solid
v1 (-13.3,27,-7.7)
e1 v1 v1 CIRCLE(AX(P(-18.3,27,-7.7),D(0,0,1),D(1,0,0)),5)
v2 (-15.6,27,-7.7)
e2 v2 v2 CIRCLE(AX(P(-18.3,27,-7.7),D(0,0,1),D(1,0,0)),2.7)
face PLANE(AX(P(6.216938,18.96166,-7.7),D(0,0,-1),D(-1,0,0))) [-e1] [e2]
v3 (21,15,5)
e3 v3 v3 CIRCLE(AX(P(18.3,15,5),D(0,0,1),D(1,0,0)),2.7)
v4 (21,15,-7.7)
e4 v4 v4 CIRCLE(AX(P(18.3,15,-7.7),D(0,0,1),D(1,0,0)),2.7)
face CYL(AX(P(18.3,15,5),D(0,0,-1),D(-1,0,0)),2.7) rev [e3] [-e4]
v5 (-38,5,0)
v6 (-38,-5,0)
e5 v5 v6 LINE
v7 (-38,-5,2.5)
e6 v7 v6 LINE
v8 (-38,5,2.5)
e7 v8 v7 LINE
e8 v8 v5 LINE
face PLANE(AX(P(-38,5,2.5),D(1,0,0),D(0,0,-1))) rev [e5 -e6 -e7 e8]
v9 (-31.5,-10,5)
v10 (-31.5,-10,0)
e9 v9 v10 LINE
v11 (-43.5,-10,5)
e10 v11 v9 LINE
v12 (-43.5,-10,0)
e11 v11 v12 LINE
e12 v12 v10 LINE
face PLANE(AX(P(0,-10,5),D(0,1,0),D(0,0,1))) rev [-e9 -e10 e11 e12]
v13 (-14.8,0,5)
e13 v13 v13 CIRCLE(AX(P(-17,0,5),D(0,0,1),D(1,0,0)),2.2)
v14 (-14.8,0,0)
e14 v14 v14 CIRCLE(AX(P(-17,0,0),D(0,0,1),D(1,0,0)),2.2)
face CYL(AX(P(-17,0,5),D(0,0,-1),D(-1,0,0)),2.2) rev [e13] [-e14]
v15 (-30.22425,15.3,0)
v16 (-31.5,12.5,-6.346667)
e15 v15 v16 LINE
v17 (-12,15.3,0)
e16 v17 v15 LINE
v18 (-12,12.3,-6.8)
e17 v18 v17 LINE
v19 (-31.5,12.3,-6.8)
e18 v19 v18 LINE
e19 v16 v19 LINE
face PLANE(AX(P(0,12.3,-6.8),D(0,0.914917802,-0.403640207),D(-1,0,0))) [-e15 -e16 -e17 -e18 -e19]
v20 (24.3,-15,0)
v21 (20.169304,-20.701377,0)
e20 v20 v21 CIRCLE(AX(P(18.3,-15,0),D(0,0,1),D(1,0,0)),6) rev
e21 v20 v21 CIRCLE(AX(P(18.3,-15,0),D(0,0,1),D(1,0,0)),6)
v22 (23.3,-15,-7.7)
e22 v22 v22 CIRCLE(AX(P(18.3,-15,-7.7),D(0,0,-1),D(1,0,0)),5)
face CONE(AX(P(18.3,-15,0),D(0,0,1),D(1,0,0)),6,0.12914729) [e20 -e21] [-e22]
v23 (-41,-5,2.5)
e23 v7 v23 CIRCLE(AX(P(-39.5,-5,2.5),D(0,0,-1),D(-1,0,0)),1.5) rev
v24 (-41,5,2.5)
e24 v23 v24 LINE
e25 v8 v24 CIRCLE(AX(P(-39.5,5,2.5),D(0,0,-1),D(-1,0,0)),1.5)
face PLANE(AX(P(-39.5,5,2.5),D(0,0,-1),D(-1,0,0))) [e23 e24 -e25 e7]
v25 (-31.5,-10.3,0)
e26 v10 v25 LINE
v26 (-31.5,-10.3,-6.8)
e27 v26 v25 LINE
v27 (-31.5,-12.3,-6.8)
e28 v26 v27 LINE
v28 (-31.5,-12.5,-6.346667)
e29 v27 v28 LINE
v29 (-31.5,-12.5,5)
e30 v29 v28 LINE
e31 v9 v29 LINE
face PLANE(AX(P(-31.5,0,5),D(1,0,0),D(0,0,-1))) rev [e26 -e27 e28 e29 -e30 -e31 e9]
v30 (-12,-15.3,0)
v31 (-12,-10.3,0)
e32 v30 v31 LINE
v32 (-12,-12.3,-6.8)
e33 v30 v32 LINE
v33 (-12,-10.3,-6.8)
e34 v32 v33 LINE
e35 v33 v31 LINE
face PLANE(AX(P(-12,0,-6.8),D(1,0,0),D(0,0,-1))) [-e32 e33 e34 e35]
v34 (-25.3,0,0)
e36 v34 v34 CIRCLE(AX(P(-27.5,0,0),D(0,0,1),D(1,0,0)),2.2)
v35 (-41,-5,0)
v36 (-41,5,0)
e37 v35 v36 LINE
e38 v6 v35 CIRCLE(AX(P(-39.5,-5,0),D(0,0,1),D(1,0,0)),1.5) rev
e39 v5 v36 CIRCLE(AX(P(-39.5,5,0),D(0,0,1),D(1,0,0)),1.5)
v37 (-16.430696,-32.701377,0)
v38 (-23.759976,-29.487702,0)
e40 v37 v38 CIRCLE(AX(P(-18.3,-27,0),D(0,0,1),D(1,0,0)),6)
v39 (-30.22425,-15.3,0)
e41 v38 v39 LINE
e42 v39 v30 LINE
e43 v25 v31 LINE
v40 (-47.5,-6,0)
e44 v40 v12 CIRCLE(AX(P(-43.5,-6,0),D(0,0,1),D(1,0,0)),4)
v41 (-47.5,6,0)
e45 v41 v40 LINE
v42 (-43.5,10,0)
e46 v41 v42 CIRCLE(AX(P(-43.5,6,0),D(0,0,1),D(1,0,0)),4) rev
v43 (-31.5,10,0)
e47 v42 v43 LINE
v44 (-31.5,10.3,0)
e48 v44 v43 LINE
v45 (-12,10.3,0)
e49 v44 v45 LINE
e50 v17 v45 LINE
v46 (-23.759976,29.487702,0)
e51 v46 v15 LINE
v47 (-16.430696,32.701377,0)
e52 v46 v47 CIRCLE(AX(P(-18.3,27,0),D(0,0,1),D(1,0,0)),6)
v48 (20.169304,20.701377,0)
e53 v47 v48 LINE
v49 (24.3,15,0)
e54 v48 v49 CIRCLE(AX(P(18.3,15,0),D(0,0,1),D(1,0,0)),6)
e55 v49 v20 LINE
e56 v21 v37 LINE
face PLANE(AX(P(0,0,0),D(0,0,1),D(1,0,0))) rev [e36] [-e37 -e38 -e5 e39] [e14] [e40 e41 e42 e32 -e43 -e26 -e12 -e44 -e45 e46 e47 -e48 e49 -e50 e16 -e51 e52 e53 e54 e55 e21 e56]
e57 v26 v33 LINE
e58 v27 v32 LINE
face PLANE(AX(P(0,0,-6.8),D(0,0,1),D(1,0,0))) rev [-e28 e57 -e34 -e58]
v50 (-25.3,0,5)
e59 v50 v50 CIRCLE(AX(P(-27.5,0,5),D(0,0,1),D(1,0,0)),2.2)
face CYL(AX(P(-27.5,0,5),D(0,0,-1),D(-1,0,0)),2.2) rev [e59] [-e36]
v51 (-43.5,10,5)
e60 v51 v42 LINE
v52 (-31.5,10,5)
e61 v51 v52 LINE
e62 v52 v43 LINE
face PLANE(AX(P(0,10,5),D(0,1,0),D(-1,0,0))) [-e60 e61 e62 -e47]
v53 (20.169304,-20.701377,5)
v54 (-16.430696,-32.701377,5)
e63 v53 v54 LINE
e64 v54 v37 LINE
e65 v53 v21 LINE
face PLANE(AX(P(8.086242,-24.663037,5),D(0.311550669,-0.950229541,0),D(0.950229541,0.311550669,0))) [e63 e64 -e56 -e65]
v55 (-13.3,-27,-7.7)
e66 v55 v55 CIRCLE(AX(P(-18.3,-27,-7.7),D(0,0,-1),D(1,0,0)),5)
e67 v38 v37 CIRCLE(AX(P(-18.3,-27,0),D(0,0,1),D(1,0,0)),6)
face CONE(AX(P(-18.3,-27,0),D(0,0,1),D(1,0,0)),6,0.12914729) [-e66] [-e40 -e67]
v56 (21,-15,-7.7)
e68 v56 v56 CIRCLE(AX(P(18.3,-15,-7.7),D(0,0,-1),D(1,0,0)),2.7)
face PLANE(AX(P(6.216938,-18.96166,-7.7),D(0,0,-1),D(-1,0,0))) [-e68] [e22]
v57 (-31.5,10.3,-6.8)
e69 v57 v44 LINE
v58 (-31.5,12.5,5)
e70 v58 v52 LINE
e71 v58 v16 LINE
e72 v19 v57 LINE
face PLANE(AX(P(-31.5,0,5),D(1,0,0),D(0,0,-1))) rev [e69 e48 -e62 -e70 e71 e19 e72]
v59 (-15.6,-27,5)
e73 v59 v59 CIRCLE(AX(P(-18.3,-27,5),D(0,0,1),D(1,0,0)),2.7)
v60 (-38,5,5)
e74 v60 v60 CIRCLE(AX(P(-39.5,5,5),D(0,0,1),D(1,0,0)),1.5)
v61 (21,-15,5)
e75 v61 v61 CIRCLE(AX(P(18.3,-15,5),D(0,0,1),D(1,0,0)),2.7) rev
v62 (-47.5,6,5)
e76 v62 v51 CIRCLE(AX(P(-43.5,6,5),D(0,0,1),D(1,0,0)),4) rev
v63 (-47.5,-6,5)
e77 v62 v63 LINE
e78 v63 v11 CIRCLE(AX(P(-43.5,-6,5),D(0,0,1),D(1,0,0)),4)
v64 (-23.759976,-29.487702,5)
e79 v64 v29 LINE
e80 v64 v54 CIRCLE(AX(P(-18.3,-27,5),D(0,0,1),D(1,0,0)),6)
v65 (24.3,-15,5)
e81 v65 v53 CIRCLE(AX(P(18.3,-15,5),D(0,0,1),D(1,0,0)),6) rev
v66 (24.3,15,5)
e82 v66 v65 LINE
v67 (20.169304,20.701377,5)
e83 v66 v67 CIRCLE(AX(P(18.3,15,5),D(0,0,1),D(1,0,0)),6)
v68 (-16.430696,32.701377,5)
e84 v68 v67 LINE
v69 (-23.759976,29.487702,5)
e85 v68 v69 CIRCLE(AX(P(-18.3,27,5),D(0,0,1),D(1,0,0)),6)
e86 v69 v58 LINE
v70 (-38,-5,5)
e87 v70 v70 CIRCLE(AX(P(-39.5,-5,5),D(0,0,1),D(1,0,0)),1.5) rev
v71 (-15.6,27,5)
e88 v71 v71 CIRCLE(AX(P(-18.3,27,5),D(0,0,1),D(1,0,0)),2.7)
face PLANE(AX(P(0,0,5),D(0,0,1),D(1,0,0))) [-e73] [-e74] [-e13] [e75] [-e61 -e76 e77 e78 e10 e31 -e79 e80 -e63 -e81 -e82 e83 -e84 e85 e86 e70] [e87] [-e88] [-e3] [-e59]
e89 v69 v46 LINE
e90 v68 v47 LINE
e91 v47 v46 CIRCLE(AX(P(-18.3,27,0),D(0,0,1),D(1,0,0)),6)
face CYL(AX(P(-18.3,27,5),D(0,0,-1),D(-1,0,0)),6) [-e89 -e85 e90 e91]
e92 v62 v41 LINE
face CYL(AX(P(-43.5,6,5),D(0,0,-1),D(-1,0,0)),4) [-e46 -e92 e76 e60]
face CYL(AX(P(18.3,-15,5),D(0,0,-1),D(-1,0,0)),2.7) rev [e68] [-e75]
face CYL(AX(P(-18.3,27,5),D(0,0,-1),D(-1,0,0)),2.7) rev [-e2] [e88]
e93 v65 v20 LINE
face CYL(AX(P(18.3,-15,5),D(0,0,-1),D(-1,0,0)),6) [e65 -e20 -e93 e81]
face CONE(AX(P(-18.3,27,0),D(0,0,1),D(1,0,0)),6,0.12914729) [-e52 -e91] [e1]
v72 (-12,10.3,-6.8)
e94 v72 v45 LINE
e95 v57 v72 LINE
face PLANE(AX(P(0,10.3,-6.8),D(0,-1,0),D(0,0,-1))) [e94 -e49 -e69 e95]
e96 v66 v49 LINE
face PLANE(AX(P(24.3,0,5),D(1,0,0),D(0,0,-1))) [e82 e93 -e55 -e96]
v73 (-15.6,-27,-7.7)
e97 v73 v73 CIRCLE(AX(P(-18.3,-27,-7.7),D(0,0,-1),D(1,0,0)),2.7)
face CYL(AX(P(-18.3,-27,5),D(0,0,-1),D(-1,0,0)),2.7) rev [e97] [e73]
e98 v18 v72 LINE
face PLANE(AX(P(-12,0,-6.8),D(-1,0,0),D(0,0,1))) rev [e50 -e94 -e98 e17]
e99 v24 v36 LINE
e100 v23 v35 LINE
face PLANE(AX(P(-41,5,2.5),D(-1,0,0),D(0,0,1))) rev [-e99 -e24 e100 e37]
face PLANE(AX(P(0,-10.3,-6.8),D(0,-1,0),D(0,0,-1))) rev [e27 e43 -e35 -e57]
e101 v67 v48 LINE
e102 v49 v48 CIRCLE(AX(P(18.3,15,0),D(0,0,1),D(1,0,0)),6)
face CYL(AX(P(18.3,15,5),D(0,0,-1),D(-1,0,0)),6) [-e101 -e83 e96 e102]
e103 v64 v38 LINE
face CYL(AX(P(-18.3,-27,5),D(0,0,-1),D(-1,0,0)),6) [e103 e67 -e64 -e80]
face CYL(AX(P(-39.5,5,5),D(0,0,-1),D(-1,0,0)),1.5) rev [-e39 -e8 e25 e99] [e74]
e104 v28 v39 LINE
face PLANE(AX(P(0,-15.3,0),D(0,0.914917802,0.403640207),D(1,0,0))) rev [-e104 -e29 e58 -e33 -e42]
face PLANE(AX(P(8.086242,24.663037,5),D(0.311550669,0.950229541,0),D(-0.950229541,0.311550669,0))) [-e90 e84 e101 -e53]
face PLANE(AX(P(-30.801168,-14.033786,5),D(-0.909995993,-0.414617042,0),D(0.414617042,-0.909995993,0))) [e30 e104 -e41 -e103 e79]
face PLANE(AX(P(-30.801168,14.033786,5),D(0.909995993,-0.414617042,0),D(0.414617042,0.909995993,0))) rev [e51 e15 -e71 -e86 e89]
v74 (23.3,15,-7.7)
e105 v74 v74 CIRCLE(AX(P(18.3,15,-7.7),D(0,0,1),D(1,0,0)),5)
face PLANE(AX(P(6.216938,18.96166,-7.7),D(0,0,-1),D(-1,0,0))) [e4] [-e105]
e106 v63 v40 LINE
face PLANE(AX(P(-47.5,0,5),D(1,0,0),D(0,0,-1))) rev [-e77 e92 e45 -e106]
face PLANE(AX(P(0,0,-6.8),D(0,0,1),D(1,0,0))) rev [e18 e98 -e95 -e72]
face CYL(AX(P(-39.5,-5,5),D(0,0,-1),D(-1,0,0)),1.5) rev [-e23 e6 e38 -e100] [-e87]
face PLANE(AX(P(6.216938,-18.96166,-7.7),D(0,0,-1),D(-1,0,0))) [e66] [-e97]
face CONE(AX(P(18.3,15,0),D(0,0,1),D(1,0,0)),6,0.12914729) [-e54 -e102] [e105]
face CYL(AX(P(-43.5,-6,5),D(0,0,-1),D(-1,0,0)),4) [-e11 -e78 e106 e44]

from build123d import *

# Parameters (mm, degrees)
SKETCH_1_R          = 2.2
SKETCH_1_R_2        = 2.7
SKETCH_1_R_3        = 1.5
EXTRUDE_1_DEPTH     = 5
SKETCH_1_4_W        = 19.5
SKETCH_1_4_H        = 2
EXTRUDE_2_DEPTH     = 6.8
CHAMFER_1_SIZE2     = 6.8
CHAMFER_1_SIZE      = 3
CHAMFER_2_SIZE2     = 6.8
CHAMFER_2_SIZE      = 3
CUT_EXTRUDE_1_DEPTH = 2.5


with BuildPart() as part:
    # 草图1 → 凸台-拉伸1 (new body)
    with BuildSketch(Plane.XY):
        with BuildLine():
            Line((-23.759975961, 29.487702254), (-31.5, 12.5))
            Line((-31.5, 12.5), (-31.5, 10))
            Line((-31.5, 10), (-43.5, 10))
            ThreePointArc((-43.5, 10), (-46.328427125, 8.828427125), (-47.5, 6))
            Line((-47.5, 6), (-47.5, -6))
            ThreePointArc((-47.5, -6), (-46.328427125, -8.828427125), (-43.5, -10))
            Line((-43.5, -10), (-31.5, -10))
            Line((-31.5, -10), (-31.5, -12.5))
            Line((-31.5, -12.5), (-23.759975961, -29.487702254))
            ThreePointArc((-23.759975961, -29.487702254), (-20.709389548, -32.494983349), (-16.430695985, -32.701377246))
            Line((-16.430695985, -32.701377246), (20.169304015, -20.701377246))
            ThreePointArc((20.169304015, -20.701377246), (23.158797387, -18.520239758), (24.3, -15))
            Line((24.3, -15), (24.3, 15))
            ThreePointArc((24.3, 15), (23.158797387, 18.520239758), (20.169304015, 20.701377246))
            Line((20.169304015, 20.701377246), (-16.430695985, 32.701377246))
            ThreePointArc((-16.430695985, 32.701377246), (-20.709389548, 32.494983349), (-23.759975961, 29.487702254))
        make_face()
        with Locations((-17, 0)):
            Circle(SKETCH_1_R, mode=Mode.SUBTRACT)
        with Locations((-27.5, 0)):
            Circle(SKETCH_1_R, mode=Mode.SUBTRACT)
        with Locations((18.3, 15)):
            Circle(SKETCH_1_R_2, mode=Mode.SUBTRACT)
        with Locations((-39.5, 5)):
            Circle(SKETCH_1_R_3, mode=Mode.SUBTRACT)
        with Locations((-39.5, -5)):
            Circle(SKETCH_1_R_3, mode=Mode.SUBTRACT)
        with Locations((18.3, -15)):
            Circle(SKETCH_1_R_2, mode=Mode.SUBTRACT)
        with Locations((-18.3, 27)):
            Circle(SKETCH_1_R_2, mode=Mode.SUBTRACT)
        with Locations((-18.3, -27)):
            Circle(SKETCH_1_R_2, mode=Mode.SUBTRACT)
    extrude(amount=EXTRUDE_1_DEPTH)

    # 草图4 → 旋转1 (revolve)
    with BuildSketch(Plane(origin=(6.216937636, 18.961659791, 0), x_dir=(-0.9502295409734977, 0.31155066917163887, 0), z_dir=(-0.31155066917163887, -0.9502295409734977, 0)), mode=Mode.PRIVATE) as revolve_1_sk:
        Polygon((-6.715940562, 0), (-7.715940562, 7.7), (-10.015940562, 7.7), (-10.015940562, 0), align=None)
    revolve_1 = revolve(revolve_1_sk.sketch.rotate(Axis((18.3, 15, 4.45283877), (0, 0, -1)), 161.847294113), axis=Axis((18.3, 15, 4.45283877), (0, 0, -1)))

    # 草图4<3> → 旋转2 (revolve)
    with BuildSketch(Plane(origin=(6.216937636, 18.961659791, 0), x_dir=(-0.9502295409734977, 0.31155066917163887, 0), z_dir=(-0.31155066917163887, -0.9502295409734977, 0)), mode=Mode.PRIVATE) as revolve_2_sk:
        Polygon((30.801068667, 7.7), (28.501068667, 7.7), (28.501068667, 0), (31.801068667, 0), align=None)
    revolve_2 = revolve(revolve_2_sk.sketch.rotate(Axis((-18.3, 27, 0), (0, 0, -1)), 161.847294113), axis=Axis((-18.3, 27, 0), (0, 0, -1)))

    # 镜向1: 旋转1, 旋转2 across plane
    add(revolve_1.mirror(Plane.ZX))
    add(revolve_2.mirror(Plane.ZX))

    # 草图1<4> → 凸台-拉伸2 (add)
    with BuildSketch(Plane.XY):
        with Locations((-21.75, 11.3)):
            Rectangle(SKETCH_1_4_W, SKETCH_1_4_H)
        with Locations((-21.75, -11.3)):
            Rectangle(SKETCH_1_4_W, SKETCH_1_4_H)
    extrude(amount=-EXTRUDE_2_DEPTH)

    # 倒角1
    chamfer_1_edges = [part.edges().sort_by_distance(p)[0] for p in [
        (-21.75, 12.3, 0),
    ]]
    chamfer_1_side = [part.faces().sort_by_distance(p)[0] for p in [
        (-21.75, 12.36, 0),
    ]]
    chamfer(chamfer_1_edges, length=CHAMFER_1_SIZE - 0.0001, length2=CHAMFER_1_SIZE2 - 0.0001, reference=chamfer_1_side[0])  # a hair under: the kernel refuses the full size

    # 倒角2
    chamfer_2_edges = [part.edges().sort_by_distance(p)[0] for p in [
        (-21.75, -12.3, 0),
    ]]
    chamfer_2_side = [part.faces().sort_by_distance(p)[0] for p in [
        (-21.75, -12.36, 0),
    ]]
    chamfer(chamfer_2_edges, length=CHAMFER_2_SIZE - 0.0001, length2=CHAMFER_2_SIZE2 - 0.0001, reference=chamfer_2_side[0])  # a hair under: the kernel refuses the full size

    # 草图5 → 切除-拉伸1 (cut)
    with BuildSketch(Plane(origin=(0, 0, 0), x_dir=(-1, 0, 0), z_dir=(0, 0, -1))):
        with BuildLine():
            Line((41, 5), (41, -5))
            ThreePointArc((41, -5), (39.5, -6.5), (38, -5))
            Line((38, -5), (38, 5))
            ThreePointArc((38, 5), (39.5, 6.5), (41, 5))
        make_face()
    extrude(amount=-CUT_EXTRUDE_1_DEPTH, mode=Mode.SUBTRACT)


solid = part.part
